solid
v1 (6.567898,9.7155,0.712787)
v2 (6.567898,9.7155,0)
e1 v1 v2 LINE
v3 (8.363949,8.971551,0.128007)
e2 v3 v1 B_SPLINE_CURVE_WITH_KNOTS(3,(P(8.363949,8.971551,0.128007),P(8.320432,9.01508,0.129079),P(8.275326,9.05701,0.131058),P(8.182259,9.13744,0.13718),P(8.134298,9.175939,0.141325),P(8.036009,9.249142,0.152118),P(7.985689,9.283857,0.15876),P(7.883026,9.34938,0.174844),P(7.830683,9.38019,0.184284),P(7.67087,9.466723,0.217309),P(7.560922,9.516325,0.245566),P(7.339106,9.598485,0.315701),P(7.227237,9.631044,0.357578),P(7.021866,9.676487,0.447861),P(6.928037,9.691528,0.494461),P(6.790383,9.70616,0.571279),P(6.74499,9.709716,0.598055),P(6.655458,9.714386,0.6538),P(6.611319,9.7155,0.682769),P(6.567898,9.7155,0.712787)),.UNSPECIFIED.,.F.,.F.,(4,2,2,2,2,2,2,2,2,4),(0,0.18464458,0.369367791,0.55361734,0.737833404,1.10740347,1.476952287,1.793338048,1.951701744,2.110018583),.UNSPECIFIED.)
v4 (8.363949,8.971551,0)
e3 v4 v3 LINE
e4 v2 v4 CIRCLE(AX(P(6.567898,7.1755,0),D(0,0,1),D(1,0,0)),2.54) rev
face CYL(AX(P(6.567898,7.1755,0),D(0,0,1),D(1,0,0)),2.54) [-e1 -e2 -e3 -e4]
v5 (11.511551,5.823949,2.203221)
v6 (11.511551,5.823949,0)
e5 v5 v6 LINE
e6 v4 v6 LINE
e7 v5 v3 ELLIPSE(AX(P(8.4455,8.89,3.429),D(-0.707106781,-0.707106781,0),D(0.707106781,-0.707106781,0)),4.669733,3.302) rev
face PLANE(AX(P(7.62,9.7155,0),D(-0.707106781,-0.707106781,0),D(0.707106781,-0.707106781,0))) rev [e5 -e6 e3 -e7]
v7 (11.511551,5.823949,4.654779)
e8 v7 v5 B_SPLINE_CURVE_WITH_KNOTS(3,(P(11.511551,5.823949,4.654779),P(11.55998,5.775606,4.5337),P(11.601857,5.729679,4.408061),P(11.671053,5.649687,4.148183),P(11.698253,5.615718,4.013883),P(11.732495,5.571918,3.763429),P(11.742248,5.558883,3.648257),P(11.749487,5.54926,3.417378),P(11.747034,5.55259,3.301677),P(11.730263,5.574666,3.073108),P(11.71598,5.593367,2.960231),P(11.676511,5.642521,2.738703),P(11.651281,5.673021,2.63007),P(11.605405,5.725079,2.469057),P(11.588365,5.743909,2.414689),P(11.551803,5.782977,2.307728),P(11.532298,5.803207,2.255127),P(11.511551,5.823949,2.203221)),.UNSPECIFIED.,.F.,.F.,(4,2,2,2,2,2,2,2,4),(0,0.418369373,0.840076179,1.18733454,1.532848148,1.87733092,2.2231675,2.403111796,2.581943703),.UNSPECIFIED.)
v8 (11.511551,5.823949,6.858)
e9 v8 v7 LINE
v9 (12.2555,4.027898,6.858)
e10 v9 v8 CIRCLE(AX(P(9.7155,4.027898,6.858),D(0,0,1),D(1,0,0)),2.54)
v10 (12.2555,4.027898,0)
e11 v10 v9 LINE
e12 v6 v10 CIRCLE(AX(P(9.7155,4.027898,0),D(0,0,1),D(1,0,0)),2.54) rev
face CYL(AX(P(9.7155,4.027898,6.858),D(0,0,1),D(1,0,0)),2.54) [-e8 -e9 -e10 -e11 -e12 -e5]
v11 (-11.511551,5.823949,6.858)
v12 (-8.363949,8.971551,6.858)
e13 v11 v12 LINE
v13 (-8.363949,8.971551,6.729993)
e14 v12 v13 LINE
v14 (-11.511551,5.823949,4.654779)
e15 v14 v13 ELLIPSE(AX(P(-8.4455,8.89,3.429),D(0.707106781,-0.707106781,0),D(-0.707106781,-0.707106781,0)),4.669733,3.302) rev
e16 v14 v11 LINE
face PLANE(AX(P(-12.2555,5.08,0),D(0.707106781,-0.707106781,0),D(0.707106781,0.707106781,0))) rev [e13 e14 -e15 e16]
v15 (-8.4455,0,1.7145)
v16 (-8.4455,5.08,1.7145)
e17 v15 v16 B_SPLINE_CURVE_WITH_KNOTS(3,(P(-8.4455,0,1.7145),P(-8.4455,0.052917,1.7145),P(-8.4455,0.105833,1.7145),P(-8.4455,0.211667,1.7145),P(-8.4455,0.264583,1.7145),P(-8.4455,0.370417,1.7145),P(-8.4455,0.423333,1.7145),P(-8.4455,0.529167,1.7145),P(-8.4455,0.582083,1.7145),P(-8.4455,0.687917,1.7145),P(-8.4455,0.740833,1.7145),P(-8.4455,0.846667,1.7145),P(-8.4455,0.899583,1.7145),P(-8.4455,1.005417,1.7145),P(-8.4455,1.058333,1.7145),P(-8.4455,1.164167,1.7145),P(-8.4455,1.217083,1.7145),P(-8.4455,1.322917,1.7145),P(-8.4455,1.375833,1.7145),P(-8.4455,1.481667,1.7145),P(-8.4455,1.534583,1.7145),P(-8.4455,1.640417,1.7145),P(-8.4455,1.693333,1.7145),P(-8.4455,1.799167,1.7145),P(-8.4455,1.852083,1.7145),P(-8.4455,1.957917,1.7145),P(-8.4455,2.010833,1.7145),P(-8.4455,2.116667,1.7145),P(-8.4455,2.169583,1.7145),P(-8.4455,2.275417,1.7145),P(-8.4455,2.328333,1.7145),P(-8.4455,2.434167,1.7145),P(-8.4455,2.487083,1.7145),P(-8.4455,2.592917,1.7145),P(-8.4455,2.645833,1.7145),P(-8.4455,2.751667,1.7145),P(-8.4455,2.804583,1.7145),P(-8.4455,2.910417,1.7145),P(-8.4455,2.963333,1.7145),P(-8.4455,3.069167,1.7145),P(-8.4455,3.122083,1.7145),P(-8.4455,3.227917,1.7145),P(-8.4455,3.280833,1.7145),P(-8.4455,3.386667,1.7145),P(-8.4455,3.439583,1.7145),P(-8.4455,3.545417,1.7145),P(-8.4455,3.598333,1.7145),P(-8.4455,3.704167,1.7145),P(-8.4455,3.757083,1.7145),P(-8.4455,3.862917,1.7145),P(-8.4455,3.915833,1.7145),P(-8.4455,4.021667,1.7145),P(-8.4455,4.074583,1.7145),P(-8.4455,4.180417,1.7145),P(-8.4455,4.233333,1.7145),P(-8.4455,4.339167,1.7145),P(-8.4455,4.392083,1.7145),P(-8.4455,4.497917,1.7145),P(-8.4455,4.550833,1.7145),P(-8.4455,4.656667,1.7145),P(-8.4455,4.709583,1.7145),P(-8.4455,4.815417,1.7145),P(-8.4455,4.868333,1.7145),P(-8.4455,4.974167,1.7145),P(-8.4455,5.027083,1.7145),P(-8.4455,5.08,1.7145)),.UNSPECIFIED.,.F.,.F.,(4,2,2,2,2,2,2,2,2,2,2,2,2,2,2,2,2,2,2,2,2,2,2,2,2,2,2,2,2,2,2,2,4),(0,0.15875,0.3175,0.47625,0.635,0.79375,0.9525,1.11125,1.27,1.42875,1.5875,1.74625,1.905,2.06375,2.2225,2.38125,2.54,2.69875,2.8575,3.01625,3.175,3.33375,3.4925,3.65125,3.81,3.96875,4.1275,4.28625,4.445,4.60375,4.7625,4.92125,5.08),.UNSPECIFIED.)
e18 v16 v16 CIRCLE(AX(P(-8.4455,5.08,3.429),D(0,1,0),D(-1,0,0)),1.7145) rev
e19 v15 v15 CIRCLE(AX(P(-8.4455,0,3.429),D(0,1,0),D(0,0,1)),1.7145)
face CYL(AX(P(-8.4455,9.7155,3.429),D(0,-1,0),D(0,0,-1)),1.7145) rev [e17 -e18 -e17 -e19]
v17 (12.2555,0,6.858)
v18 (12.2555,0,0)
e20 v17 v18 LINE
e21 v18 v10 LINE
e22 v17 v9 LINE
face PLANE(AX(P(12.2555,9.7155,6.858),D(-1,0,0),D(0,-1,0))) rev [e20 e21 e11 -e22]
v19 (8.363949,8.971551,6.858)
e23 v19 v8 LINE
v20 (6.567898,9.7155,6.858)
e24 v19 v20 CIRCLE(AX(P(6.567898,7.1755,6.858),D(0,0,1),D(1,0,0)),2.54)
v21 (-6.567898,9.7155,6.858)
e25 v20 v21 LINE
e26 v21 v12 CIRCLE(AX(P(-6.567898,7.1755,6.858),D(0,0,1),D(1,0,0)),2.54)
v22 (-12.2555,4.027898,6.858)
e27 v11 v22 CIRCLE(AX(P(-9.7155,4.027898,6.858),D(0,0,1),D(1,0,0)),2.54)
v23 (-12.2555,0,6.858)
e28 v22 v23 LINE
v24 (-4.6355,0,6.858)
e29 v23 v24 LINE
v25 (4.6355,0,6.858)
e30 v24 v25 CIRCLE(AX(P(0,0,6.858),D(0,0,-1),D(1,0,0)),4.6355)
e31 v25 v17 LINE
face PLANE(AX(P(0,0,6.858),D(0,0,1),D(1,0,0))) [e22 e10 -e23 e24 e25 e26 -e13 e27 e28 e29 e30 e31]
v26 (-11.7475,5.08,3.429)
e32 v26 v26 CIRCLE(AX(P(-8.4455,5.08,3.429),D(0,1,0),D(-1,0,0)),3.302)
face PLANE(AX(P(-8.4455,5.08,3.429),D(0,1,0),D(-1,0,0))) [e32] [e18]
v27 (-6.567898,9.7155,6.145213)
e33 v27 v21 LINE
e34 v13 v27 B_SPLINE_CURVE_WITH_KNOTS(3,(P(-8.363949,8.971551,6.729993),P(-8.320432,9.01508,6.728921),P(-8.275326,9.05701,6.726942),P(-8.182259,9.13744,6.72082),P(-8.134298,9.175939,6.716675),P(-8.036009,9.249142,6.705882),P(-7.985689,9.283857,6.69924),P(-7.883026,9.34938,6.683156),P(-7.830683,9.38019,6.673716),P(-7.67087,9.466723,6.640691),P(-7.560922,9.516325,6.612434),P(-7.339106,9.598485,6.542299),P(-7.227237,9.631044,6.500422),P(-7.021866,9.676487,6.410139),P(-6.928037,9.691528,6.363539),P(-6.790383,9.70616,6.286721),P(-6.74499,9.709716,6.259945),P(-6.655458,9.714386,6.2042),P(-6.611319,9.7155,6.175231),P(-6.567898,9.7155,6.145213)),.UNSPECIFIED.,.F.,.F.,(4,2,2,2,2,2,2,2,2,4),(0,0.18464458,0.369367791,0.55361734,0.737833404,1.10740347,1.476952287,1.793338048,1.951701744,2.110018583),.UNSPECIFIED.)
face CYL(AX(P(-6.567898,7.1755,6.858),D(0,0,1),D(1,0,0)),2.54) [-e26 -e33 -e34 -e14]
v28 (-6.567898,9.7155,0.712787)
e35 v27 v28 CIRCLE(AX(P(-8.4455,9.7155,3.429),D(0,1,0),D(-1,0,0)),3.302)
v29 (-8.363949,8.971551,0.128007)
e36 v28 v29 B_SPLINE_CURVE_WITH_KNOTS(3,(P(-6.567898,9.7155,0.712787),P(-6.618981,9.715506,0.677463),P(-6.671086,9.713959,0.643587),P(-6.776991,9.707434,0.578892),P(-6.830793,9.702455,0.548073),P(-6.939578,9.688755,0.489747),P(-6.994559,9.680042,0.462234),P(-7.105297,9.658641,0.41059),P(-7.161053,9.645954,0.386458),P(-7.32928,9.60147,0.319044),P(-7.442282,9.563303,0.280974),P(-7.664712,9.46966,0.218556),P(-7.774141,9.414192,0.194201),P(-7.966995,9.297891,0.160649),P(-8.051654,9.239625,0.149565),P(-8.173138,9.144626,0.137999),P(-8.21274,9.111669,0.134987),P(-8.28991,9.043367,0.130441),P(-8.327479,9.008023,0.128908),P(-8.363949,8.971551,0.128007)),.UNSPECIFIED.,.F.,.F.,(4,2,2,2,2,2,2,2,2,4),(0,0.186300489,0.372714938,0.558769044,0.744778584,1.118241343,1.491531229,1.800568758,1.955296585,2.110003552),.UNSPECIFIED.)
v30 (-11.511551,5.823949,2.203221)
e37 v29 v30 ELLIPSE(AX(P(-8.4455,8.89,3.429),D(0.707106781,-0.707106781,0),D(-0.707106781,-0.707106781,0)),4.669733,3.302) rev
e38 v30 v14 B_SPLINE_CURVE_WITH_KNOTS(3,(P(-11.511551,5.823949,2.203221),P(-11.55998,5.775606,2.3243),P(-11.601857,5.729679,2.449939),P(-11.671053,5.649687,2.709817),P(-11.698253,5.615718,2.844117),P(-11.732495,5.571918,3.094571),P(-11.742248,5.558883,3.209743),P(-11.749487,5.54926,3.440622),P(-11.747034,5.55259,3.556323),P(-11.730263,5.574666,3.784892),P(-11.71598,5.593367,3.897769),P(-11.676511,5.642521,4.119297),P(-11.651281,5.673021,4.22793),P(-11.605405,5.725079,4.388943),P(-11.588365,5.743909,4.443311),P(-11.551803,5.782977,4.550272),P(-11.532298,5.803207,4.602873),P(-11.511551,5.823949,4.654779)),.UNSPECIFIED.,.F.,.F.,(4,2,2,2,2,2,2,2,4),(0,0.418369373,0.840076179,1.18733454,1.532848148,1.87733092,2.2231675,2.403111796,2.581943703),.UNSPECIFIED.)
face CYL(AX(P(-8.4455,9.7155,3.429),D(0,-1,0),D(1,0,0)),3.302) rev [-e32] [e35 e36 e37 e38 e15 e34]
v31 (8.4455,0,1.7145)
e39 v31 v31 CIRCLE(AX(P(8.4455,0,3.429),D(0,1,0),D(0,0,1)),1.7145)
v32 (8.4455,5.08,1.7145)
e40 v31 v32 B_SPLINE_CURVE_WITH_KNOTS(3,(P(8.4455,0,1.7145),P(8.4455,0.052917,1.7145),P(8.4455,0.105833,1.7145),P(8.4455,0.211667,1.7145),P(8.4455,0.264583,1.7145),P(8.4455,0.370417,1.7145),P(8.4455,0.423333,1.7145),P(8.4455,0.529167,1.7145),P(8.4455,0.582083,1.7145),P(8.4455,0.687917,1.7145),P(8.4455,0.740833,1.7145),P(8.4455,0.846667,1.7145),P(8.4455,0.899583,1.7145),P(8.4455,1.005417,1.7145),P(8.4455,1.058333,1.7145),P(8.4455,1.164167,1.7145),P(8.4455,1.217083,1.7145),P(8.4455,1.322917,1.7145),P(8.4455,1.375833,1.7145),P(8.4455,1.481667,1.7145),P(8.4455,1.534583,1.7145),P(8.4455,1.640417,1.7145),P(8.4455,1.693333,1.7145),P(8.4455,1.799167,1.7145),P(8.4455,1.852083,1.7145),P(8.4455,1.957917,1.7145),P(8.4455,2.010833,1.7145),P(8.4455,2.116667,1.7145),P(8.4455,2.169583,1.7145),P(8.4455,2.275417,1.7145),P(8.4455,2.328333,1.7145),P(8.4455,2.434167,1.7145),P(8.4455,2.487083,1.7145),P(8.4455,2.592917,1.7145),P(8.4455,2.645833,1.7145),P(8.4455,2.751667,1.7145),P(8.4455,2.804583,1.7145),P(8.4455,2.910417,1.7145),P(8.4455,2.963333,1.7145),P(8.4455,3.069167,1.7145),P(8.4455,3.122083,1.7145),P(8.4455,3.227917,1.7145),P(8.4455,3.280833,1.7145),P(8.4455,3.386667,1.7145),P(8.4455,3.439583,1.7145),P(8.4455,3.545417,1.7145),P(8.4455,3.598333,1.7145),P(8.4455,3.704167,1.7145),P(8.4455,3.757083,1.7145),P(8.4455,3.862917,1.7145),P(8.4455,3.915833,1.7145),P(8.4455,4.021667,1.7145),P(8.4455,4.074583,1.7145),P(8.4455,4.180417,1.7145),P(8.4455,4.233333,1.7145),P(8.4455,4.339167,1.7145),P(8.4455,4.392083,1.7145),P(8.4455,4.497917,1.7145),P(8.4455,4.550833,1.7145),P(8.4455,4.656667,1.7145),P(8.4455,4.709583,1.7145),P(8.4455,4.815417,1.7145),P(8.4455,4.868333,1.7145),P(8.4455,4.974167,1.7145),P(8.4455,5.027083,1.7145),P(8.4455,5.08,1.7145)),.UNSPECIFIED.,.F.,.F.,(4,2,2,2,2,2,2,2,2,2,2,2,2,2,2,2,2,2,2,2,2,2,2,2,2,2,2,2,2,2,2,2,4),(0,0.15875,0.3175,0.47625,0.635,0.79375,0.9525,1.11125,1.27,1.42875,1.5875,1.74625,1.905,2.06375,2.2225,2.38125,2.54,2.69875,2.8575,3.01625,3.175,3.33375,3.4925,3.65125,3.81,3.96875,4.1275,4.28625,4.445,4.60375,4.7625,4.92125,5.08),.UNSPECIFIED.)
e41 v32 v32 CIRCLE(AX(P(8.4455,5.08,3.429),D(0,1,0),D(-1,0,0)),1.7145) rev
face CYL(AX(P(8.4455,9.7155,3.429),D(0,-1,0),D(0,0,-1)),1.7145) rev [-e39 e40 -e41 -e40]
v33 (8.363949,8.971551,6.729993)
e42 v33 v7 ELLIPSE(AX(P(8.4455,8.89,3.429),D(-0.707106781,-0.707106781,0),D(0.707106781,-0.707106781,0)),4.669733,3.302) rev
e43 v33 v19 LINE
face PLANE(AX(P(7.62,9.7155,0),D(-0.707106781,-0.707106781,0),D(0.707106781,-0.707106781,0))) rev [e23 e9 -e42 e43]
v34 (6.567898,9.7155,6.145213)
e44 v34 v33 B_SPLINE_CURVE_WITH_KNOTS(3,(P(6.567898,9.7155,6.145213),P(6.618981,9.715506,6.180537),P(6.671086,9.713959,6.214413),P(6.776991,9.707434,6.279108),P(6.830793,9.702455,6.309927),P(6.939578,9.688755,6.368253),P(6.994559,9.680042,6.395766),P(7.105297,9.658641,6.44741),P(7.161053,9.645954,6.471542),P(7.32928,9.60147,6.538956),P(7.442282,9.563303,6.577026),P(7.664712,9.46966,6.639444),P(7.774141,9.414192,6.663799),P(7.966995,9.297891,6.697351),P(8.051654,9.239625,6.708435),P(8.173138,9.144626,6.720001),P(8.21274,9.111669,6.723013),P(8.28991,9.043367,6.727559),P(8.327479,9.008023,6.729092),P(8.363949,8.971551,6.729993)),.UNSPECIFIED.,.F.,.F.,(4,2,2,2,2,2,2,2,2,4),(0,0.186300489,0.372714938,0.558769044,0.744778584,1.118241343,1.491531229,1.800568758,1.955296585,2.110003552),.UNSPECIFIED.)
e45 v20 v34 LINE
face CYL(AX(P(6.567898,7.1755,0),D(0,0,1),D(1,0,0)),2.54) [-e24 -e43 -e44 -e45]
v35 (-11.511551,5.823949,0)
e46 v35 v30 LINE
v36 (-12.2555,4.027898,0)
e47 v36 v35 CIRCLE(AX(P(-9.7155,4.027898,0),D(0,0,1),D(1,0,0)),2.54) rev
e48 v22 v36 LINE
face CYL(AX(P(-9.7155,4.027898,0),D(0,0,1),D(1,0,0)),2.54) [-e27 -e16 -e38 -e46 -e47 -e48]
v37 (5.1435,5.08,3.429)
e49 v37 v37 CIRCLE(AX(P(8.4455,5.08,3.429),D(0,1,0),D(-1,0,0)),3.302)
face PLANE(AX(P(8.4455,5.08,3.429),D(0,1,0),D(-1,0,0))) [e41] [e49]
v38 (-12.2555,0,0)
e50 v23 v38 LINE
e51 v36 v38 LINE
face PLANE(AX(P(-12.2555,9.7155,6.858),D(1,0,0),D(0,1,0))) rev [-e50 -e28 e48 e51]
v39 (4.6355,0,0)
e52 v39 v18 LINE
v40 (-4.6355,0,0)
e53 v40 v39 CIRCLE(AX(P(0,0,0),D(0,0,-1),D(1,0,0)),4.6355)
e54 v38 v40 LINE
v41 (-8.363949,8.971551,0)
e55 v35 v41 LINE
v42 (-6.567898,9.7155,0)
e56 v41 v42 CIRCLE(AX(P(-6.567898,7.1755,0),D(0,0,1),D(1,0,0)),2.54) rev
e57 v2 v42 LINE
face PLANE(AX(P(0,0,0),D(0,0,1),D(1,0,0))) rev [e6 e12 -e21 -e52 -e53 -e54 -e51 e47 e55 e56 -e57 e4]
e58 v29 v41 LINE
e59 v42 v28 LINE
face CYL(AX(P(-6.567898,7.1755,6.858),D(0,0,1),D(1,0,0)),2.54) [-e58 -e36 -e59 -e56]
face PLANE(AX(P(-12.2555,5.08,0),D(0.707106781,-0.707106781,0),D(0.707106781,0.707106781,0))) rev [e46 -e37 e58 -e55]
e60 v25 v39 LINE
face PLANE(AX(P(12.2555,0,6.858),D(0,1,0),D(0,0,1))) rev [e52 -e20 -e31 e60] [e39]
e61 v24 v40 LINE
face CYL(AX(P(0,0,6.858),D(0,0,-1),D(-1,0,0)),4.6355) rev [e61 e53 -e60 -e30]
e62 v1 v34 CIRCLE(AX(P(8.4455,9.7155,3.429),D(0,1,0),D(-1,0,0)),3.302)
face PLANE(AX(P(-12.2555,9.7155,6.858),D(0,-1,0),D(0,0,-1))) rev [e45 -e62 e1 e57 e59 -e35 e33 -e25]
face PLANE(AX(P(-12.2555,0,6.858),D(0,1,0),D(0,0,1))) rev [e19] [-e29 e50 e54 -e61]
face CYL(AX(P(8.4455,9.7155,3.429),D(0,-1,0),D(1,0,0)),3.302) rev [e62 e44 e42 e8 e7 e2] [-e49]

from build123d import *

# Parameters (mm, degrees)
BOSS_EXTRUDE1_DEPTH     = 6.858
CUT_EXTRUDE1_DEPTH      = 18.07689622
CUT_EXTRUDE1_DEPTH_BACK = 18.07689622
SKETCH3_R               = 1.7145
CUT_EXTRUDE2_DEPTH      = 18.07689622
SKETCH5_R               = 3.302
CUT_EXTRUDE3_DEPTH      = 15.934384629
FILLET1_R               = 2.54
FILLET2_R               = 2.54


with BuildPart() as part:
    # Sketch2 → Boss-Extrude1 (new body)
    with BuildSketch(Plane.XY):
        with BuildLine():
            Line((-12.2555, 9.7155), (12.2555, 9.7155))
            Line((12.2555, 9.7155), (12.2555, 0))
            Line((12.2555, 0), (4.6355, 0))
            ThreePointArc((4.6355, 0), (0, 4.6355), (-4.6355, 0))
            Line((-4.6355, 0), (-12.2555, 0))
            Line((-12.2555, 0), (-12.2555, 9.7155))
        make_face()
    extrude(amount=BOSS_EXTRUDE1_DEPTH)

    # Sketch3 → Cut-Extrude1 (cut, two sides: drawn at the far end of the back side and taken through both)
    with BuildSketch(Plane.XZ.offset(-CUT_EXTRUDE1_DEPTH_BACK)):
        with Locations(Location((-8.4455, 3.429, 0), (0, 0, 270))):
            Circle(SKETCH3_R)
        with Locations(Location((8.4455, 3.429, 0), (0, 0, 270))):
            Circle(SKETCH3_R)
    extrude(amount=CUT_EXTRUDE1_DEPTH + CUT_EXTRUDE1_DEPTH_BACK, mode=Mode.SUBTRACT)

    # Sketch4 → Cut-Extrude2 (cut, through all)
    with BuildSketch(Plane.XY.offset(6.858)):
        Polygon((-12.2555, 5.08), (-7.62, 9.7155), (-12.2555, 9.7155), align=None)
        Polygon((12.2555, 9.7155), (7.62, 9.7155), (12.2555, 5.08), align=None)
    extrude(amount=-CUT_EXTRUDE2_DEPTH, mode=Mode.SUBTRACT)

    # Sketch5 → Cut-Extrude3 (cut, through all)
    with BuildSketch(Plane(origin=(0, 5.08, 0), x_dir=(1, 0, 0), z_dir=(0, 1, 0))):
        with Locations(Location((-8.4455, -3.429, 0), (0, 0, 284.477512186))):
            Circle(SKETCH5_R)
        with Locations(Location((8.4455, -3.429, 0), (0, 0, 104.477512186))):
            Circle(SKETCH5_R)
    extrude(amount=CUT_EXTRUDE3_DEPTH, mode=Mode.SUBTRACT)

    # Fillet1
    # the kernel refuses this fillet: 2.54 mm, written as the material it takes off along each edge
    with BuildSketch(Plane(origin=(7.62, 9.7155, 2.862108369), x_dir=(0.707106781186544, -0.7071067811865508, 0), z_dir=(0, 0, -1)), Plane(origin=(7.62, 9.7155, 9.488256121), x_dir=(0.707106781186544, -0.7071067811865508, 0), z_dir=(0, 0, -1)), Plane(origin=(-7.62, 9.7155, 9.488256121), x_dir=(1, 0, 0), z_dir=(0, 0, -1)), Plane(origin=(-7.62, 9.7155, 2.862108369), x_dir=(1, 0, 0), z_dir=(0, 0, -1))) as fillet1_piece_1:
        with BuildLine():
            CenterArc((FILLET1_R * 0.414213562373, FILLET1_R), FILLET1_R, 225, 45)
            Line((-FILLET1_R * 0.292893218813, FILLET1_R * 0.292893218813), (0, 0))
            Line((0, 0), (FILLET1_R * 0.414213562373, 0))
        make_face()
    extrude(amount=5.49236449, mode=Mode.SUBTRACT)

    # Fillet2
    # the kernel refuses this fillet: 2.54 mm, written as the material it takes off along each edge
    with BuildSketch(Plane(origin=(-12.2555, 5.08, 9.488256121), x_dir=(0, -1, 0), z_dir=(0, 0, -1))) as fillet2_piece_1:
        with BuildLine():
            CenterArc((FILLET2_R * 0.414213562373, -FILLET2_R), FILLET2_R, 90, 45)
            Line((-FILLET2_R * 0.292893218813, -FILLET2_R * 0.292893218813), (0, 0))
            Line((0, 0), (FILLET2_R * 0.414213562373, 0))
        make_face()
    extrude(amount=12.118512242, mode=Mode.SUBTRACT)
    with BuildSketch(Plane(origin=(12.2555, 5.08, 9.488256121), x_dir=(0, -1, 0), z_dir=(0, 0, -1))) as fillet2_piece_2:
        with BuildLine():
            CenterArc((FILLET2_R * 0.414213562373, FILLET2_R), FILLET2_R, 225, 45)
            Line((-FILLET2_R * 0.292893218813, FILLET2_R * 0.292893218813), (0, 0))
            Line((0, 0), (FILLET2_R * 0.414213562373, 0))
        make_face()
    extrude(amount=12.118512242, mode=Mode.SUBTRACT)


solid = part.part
